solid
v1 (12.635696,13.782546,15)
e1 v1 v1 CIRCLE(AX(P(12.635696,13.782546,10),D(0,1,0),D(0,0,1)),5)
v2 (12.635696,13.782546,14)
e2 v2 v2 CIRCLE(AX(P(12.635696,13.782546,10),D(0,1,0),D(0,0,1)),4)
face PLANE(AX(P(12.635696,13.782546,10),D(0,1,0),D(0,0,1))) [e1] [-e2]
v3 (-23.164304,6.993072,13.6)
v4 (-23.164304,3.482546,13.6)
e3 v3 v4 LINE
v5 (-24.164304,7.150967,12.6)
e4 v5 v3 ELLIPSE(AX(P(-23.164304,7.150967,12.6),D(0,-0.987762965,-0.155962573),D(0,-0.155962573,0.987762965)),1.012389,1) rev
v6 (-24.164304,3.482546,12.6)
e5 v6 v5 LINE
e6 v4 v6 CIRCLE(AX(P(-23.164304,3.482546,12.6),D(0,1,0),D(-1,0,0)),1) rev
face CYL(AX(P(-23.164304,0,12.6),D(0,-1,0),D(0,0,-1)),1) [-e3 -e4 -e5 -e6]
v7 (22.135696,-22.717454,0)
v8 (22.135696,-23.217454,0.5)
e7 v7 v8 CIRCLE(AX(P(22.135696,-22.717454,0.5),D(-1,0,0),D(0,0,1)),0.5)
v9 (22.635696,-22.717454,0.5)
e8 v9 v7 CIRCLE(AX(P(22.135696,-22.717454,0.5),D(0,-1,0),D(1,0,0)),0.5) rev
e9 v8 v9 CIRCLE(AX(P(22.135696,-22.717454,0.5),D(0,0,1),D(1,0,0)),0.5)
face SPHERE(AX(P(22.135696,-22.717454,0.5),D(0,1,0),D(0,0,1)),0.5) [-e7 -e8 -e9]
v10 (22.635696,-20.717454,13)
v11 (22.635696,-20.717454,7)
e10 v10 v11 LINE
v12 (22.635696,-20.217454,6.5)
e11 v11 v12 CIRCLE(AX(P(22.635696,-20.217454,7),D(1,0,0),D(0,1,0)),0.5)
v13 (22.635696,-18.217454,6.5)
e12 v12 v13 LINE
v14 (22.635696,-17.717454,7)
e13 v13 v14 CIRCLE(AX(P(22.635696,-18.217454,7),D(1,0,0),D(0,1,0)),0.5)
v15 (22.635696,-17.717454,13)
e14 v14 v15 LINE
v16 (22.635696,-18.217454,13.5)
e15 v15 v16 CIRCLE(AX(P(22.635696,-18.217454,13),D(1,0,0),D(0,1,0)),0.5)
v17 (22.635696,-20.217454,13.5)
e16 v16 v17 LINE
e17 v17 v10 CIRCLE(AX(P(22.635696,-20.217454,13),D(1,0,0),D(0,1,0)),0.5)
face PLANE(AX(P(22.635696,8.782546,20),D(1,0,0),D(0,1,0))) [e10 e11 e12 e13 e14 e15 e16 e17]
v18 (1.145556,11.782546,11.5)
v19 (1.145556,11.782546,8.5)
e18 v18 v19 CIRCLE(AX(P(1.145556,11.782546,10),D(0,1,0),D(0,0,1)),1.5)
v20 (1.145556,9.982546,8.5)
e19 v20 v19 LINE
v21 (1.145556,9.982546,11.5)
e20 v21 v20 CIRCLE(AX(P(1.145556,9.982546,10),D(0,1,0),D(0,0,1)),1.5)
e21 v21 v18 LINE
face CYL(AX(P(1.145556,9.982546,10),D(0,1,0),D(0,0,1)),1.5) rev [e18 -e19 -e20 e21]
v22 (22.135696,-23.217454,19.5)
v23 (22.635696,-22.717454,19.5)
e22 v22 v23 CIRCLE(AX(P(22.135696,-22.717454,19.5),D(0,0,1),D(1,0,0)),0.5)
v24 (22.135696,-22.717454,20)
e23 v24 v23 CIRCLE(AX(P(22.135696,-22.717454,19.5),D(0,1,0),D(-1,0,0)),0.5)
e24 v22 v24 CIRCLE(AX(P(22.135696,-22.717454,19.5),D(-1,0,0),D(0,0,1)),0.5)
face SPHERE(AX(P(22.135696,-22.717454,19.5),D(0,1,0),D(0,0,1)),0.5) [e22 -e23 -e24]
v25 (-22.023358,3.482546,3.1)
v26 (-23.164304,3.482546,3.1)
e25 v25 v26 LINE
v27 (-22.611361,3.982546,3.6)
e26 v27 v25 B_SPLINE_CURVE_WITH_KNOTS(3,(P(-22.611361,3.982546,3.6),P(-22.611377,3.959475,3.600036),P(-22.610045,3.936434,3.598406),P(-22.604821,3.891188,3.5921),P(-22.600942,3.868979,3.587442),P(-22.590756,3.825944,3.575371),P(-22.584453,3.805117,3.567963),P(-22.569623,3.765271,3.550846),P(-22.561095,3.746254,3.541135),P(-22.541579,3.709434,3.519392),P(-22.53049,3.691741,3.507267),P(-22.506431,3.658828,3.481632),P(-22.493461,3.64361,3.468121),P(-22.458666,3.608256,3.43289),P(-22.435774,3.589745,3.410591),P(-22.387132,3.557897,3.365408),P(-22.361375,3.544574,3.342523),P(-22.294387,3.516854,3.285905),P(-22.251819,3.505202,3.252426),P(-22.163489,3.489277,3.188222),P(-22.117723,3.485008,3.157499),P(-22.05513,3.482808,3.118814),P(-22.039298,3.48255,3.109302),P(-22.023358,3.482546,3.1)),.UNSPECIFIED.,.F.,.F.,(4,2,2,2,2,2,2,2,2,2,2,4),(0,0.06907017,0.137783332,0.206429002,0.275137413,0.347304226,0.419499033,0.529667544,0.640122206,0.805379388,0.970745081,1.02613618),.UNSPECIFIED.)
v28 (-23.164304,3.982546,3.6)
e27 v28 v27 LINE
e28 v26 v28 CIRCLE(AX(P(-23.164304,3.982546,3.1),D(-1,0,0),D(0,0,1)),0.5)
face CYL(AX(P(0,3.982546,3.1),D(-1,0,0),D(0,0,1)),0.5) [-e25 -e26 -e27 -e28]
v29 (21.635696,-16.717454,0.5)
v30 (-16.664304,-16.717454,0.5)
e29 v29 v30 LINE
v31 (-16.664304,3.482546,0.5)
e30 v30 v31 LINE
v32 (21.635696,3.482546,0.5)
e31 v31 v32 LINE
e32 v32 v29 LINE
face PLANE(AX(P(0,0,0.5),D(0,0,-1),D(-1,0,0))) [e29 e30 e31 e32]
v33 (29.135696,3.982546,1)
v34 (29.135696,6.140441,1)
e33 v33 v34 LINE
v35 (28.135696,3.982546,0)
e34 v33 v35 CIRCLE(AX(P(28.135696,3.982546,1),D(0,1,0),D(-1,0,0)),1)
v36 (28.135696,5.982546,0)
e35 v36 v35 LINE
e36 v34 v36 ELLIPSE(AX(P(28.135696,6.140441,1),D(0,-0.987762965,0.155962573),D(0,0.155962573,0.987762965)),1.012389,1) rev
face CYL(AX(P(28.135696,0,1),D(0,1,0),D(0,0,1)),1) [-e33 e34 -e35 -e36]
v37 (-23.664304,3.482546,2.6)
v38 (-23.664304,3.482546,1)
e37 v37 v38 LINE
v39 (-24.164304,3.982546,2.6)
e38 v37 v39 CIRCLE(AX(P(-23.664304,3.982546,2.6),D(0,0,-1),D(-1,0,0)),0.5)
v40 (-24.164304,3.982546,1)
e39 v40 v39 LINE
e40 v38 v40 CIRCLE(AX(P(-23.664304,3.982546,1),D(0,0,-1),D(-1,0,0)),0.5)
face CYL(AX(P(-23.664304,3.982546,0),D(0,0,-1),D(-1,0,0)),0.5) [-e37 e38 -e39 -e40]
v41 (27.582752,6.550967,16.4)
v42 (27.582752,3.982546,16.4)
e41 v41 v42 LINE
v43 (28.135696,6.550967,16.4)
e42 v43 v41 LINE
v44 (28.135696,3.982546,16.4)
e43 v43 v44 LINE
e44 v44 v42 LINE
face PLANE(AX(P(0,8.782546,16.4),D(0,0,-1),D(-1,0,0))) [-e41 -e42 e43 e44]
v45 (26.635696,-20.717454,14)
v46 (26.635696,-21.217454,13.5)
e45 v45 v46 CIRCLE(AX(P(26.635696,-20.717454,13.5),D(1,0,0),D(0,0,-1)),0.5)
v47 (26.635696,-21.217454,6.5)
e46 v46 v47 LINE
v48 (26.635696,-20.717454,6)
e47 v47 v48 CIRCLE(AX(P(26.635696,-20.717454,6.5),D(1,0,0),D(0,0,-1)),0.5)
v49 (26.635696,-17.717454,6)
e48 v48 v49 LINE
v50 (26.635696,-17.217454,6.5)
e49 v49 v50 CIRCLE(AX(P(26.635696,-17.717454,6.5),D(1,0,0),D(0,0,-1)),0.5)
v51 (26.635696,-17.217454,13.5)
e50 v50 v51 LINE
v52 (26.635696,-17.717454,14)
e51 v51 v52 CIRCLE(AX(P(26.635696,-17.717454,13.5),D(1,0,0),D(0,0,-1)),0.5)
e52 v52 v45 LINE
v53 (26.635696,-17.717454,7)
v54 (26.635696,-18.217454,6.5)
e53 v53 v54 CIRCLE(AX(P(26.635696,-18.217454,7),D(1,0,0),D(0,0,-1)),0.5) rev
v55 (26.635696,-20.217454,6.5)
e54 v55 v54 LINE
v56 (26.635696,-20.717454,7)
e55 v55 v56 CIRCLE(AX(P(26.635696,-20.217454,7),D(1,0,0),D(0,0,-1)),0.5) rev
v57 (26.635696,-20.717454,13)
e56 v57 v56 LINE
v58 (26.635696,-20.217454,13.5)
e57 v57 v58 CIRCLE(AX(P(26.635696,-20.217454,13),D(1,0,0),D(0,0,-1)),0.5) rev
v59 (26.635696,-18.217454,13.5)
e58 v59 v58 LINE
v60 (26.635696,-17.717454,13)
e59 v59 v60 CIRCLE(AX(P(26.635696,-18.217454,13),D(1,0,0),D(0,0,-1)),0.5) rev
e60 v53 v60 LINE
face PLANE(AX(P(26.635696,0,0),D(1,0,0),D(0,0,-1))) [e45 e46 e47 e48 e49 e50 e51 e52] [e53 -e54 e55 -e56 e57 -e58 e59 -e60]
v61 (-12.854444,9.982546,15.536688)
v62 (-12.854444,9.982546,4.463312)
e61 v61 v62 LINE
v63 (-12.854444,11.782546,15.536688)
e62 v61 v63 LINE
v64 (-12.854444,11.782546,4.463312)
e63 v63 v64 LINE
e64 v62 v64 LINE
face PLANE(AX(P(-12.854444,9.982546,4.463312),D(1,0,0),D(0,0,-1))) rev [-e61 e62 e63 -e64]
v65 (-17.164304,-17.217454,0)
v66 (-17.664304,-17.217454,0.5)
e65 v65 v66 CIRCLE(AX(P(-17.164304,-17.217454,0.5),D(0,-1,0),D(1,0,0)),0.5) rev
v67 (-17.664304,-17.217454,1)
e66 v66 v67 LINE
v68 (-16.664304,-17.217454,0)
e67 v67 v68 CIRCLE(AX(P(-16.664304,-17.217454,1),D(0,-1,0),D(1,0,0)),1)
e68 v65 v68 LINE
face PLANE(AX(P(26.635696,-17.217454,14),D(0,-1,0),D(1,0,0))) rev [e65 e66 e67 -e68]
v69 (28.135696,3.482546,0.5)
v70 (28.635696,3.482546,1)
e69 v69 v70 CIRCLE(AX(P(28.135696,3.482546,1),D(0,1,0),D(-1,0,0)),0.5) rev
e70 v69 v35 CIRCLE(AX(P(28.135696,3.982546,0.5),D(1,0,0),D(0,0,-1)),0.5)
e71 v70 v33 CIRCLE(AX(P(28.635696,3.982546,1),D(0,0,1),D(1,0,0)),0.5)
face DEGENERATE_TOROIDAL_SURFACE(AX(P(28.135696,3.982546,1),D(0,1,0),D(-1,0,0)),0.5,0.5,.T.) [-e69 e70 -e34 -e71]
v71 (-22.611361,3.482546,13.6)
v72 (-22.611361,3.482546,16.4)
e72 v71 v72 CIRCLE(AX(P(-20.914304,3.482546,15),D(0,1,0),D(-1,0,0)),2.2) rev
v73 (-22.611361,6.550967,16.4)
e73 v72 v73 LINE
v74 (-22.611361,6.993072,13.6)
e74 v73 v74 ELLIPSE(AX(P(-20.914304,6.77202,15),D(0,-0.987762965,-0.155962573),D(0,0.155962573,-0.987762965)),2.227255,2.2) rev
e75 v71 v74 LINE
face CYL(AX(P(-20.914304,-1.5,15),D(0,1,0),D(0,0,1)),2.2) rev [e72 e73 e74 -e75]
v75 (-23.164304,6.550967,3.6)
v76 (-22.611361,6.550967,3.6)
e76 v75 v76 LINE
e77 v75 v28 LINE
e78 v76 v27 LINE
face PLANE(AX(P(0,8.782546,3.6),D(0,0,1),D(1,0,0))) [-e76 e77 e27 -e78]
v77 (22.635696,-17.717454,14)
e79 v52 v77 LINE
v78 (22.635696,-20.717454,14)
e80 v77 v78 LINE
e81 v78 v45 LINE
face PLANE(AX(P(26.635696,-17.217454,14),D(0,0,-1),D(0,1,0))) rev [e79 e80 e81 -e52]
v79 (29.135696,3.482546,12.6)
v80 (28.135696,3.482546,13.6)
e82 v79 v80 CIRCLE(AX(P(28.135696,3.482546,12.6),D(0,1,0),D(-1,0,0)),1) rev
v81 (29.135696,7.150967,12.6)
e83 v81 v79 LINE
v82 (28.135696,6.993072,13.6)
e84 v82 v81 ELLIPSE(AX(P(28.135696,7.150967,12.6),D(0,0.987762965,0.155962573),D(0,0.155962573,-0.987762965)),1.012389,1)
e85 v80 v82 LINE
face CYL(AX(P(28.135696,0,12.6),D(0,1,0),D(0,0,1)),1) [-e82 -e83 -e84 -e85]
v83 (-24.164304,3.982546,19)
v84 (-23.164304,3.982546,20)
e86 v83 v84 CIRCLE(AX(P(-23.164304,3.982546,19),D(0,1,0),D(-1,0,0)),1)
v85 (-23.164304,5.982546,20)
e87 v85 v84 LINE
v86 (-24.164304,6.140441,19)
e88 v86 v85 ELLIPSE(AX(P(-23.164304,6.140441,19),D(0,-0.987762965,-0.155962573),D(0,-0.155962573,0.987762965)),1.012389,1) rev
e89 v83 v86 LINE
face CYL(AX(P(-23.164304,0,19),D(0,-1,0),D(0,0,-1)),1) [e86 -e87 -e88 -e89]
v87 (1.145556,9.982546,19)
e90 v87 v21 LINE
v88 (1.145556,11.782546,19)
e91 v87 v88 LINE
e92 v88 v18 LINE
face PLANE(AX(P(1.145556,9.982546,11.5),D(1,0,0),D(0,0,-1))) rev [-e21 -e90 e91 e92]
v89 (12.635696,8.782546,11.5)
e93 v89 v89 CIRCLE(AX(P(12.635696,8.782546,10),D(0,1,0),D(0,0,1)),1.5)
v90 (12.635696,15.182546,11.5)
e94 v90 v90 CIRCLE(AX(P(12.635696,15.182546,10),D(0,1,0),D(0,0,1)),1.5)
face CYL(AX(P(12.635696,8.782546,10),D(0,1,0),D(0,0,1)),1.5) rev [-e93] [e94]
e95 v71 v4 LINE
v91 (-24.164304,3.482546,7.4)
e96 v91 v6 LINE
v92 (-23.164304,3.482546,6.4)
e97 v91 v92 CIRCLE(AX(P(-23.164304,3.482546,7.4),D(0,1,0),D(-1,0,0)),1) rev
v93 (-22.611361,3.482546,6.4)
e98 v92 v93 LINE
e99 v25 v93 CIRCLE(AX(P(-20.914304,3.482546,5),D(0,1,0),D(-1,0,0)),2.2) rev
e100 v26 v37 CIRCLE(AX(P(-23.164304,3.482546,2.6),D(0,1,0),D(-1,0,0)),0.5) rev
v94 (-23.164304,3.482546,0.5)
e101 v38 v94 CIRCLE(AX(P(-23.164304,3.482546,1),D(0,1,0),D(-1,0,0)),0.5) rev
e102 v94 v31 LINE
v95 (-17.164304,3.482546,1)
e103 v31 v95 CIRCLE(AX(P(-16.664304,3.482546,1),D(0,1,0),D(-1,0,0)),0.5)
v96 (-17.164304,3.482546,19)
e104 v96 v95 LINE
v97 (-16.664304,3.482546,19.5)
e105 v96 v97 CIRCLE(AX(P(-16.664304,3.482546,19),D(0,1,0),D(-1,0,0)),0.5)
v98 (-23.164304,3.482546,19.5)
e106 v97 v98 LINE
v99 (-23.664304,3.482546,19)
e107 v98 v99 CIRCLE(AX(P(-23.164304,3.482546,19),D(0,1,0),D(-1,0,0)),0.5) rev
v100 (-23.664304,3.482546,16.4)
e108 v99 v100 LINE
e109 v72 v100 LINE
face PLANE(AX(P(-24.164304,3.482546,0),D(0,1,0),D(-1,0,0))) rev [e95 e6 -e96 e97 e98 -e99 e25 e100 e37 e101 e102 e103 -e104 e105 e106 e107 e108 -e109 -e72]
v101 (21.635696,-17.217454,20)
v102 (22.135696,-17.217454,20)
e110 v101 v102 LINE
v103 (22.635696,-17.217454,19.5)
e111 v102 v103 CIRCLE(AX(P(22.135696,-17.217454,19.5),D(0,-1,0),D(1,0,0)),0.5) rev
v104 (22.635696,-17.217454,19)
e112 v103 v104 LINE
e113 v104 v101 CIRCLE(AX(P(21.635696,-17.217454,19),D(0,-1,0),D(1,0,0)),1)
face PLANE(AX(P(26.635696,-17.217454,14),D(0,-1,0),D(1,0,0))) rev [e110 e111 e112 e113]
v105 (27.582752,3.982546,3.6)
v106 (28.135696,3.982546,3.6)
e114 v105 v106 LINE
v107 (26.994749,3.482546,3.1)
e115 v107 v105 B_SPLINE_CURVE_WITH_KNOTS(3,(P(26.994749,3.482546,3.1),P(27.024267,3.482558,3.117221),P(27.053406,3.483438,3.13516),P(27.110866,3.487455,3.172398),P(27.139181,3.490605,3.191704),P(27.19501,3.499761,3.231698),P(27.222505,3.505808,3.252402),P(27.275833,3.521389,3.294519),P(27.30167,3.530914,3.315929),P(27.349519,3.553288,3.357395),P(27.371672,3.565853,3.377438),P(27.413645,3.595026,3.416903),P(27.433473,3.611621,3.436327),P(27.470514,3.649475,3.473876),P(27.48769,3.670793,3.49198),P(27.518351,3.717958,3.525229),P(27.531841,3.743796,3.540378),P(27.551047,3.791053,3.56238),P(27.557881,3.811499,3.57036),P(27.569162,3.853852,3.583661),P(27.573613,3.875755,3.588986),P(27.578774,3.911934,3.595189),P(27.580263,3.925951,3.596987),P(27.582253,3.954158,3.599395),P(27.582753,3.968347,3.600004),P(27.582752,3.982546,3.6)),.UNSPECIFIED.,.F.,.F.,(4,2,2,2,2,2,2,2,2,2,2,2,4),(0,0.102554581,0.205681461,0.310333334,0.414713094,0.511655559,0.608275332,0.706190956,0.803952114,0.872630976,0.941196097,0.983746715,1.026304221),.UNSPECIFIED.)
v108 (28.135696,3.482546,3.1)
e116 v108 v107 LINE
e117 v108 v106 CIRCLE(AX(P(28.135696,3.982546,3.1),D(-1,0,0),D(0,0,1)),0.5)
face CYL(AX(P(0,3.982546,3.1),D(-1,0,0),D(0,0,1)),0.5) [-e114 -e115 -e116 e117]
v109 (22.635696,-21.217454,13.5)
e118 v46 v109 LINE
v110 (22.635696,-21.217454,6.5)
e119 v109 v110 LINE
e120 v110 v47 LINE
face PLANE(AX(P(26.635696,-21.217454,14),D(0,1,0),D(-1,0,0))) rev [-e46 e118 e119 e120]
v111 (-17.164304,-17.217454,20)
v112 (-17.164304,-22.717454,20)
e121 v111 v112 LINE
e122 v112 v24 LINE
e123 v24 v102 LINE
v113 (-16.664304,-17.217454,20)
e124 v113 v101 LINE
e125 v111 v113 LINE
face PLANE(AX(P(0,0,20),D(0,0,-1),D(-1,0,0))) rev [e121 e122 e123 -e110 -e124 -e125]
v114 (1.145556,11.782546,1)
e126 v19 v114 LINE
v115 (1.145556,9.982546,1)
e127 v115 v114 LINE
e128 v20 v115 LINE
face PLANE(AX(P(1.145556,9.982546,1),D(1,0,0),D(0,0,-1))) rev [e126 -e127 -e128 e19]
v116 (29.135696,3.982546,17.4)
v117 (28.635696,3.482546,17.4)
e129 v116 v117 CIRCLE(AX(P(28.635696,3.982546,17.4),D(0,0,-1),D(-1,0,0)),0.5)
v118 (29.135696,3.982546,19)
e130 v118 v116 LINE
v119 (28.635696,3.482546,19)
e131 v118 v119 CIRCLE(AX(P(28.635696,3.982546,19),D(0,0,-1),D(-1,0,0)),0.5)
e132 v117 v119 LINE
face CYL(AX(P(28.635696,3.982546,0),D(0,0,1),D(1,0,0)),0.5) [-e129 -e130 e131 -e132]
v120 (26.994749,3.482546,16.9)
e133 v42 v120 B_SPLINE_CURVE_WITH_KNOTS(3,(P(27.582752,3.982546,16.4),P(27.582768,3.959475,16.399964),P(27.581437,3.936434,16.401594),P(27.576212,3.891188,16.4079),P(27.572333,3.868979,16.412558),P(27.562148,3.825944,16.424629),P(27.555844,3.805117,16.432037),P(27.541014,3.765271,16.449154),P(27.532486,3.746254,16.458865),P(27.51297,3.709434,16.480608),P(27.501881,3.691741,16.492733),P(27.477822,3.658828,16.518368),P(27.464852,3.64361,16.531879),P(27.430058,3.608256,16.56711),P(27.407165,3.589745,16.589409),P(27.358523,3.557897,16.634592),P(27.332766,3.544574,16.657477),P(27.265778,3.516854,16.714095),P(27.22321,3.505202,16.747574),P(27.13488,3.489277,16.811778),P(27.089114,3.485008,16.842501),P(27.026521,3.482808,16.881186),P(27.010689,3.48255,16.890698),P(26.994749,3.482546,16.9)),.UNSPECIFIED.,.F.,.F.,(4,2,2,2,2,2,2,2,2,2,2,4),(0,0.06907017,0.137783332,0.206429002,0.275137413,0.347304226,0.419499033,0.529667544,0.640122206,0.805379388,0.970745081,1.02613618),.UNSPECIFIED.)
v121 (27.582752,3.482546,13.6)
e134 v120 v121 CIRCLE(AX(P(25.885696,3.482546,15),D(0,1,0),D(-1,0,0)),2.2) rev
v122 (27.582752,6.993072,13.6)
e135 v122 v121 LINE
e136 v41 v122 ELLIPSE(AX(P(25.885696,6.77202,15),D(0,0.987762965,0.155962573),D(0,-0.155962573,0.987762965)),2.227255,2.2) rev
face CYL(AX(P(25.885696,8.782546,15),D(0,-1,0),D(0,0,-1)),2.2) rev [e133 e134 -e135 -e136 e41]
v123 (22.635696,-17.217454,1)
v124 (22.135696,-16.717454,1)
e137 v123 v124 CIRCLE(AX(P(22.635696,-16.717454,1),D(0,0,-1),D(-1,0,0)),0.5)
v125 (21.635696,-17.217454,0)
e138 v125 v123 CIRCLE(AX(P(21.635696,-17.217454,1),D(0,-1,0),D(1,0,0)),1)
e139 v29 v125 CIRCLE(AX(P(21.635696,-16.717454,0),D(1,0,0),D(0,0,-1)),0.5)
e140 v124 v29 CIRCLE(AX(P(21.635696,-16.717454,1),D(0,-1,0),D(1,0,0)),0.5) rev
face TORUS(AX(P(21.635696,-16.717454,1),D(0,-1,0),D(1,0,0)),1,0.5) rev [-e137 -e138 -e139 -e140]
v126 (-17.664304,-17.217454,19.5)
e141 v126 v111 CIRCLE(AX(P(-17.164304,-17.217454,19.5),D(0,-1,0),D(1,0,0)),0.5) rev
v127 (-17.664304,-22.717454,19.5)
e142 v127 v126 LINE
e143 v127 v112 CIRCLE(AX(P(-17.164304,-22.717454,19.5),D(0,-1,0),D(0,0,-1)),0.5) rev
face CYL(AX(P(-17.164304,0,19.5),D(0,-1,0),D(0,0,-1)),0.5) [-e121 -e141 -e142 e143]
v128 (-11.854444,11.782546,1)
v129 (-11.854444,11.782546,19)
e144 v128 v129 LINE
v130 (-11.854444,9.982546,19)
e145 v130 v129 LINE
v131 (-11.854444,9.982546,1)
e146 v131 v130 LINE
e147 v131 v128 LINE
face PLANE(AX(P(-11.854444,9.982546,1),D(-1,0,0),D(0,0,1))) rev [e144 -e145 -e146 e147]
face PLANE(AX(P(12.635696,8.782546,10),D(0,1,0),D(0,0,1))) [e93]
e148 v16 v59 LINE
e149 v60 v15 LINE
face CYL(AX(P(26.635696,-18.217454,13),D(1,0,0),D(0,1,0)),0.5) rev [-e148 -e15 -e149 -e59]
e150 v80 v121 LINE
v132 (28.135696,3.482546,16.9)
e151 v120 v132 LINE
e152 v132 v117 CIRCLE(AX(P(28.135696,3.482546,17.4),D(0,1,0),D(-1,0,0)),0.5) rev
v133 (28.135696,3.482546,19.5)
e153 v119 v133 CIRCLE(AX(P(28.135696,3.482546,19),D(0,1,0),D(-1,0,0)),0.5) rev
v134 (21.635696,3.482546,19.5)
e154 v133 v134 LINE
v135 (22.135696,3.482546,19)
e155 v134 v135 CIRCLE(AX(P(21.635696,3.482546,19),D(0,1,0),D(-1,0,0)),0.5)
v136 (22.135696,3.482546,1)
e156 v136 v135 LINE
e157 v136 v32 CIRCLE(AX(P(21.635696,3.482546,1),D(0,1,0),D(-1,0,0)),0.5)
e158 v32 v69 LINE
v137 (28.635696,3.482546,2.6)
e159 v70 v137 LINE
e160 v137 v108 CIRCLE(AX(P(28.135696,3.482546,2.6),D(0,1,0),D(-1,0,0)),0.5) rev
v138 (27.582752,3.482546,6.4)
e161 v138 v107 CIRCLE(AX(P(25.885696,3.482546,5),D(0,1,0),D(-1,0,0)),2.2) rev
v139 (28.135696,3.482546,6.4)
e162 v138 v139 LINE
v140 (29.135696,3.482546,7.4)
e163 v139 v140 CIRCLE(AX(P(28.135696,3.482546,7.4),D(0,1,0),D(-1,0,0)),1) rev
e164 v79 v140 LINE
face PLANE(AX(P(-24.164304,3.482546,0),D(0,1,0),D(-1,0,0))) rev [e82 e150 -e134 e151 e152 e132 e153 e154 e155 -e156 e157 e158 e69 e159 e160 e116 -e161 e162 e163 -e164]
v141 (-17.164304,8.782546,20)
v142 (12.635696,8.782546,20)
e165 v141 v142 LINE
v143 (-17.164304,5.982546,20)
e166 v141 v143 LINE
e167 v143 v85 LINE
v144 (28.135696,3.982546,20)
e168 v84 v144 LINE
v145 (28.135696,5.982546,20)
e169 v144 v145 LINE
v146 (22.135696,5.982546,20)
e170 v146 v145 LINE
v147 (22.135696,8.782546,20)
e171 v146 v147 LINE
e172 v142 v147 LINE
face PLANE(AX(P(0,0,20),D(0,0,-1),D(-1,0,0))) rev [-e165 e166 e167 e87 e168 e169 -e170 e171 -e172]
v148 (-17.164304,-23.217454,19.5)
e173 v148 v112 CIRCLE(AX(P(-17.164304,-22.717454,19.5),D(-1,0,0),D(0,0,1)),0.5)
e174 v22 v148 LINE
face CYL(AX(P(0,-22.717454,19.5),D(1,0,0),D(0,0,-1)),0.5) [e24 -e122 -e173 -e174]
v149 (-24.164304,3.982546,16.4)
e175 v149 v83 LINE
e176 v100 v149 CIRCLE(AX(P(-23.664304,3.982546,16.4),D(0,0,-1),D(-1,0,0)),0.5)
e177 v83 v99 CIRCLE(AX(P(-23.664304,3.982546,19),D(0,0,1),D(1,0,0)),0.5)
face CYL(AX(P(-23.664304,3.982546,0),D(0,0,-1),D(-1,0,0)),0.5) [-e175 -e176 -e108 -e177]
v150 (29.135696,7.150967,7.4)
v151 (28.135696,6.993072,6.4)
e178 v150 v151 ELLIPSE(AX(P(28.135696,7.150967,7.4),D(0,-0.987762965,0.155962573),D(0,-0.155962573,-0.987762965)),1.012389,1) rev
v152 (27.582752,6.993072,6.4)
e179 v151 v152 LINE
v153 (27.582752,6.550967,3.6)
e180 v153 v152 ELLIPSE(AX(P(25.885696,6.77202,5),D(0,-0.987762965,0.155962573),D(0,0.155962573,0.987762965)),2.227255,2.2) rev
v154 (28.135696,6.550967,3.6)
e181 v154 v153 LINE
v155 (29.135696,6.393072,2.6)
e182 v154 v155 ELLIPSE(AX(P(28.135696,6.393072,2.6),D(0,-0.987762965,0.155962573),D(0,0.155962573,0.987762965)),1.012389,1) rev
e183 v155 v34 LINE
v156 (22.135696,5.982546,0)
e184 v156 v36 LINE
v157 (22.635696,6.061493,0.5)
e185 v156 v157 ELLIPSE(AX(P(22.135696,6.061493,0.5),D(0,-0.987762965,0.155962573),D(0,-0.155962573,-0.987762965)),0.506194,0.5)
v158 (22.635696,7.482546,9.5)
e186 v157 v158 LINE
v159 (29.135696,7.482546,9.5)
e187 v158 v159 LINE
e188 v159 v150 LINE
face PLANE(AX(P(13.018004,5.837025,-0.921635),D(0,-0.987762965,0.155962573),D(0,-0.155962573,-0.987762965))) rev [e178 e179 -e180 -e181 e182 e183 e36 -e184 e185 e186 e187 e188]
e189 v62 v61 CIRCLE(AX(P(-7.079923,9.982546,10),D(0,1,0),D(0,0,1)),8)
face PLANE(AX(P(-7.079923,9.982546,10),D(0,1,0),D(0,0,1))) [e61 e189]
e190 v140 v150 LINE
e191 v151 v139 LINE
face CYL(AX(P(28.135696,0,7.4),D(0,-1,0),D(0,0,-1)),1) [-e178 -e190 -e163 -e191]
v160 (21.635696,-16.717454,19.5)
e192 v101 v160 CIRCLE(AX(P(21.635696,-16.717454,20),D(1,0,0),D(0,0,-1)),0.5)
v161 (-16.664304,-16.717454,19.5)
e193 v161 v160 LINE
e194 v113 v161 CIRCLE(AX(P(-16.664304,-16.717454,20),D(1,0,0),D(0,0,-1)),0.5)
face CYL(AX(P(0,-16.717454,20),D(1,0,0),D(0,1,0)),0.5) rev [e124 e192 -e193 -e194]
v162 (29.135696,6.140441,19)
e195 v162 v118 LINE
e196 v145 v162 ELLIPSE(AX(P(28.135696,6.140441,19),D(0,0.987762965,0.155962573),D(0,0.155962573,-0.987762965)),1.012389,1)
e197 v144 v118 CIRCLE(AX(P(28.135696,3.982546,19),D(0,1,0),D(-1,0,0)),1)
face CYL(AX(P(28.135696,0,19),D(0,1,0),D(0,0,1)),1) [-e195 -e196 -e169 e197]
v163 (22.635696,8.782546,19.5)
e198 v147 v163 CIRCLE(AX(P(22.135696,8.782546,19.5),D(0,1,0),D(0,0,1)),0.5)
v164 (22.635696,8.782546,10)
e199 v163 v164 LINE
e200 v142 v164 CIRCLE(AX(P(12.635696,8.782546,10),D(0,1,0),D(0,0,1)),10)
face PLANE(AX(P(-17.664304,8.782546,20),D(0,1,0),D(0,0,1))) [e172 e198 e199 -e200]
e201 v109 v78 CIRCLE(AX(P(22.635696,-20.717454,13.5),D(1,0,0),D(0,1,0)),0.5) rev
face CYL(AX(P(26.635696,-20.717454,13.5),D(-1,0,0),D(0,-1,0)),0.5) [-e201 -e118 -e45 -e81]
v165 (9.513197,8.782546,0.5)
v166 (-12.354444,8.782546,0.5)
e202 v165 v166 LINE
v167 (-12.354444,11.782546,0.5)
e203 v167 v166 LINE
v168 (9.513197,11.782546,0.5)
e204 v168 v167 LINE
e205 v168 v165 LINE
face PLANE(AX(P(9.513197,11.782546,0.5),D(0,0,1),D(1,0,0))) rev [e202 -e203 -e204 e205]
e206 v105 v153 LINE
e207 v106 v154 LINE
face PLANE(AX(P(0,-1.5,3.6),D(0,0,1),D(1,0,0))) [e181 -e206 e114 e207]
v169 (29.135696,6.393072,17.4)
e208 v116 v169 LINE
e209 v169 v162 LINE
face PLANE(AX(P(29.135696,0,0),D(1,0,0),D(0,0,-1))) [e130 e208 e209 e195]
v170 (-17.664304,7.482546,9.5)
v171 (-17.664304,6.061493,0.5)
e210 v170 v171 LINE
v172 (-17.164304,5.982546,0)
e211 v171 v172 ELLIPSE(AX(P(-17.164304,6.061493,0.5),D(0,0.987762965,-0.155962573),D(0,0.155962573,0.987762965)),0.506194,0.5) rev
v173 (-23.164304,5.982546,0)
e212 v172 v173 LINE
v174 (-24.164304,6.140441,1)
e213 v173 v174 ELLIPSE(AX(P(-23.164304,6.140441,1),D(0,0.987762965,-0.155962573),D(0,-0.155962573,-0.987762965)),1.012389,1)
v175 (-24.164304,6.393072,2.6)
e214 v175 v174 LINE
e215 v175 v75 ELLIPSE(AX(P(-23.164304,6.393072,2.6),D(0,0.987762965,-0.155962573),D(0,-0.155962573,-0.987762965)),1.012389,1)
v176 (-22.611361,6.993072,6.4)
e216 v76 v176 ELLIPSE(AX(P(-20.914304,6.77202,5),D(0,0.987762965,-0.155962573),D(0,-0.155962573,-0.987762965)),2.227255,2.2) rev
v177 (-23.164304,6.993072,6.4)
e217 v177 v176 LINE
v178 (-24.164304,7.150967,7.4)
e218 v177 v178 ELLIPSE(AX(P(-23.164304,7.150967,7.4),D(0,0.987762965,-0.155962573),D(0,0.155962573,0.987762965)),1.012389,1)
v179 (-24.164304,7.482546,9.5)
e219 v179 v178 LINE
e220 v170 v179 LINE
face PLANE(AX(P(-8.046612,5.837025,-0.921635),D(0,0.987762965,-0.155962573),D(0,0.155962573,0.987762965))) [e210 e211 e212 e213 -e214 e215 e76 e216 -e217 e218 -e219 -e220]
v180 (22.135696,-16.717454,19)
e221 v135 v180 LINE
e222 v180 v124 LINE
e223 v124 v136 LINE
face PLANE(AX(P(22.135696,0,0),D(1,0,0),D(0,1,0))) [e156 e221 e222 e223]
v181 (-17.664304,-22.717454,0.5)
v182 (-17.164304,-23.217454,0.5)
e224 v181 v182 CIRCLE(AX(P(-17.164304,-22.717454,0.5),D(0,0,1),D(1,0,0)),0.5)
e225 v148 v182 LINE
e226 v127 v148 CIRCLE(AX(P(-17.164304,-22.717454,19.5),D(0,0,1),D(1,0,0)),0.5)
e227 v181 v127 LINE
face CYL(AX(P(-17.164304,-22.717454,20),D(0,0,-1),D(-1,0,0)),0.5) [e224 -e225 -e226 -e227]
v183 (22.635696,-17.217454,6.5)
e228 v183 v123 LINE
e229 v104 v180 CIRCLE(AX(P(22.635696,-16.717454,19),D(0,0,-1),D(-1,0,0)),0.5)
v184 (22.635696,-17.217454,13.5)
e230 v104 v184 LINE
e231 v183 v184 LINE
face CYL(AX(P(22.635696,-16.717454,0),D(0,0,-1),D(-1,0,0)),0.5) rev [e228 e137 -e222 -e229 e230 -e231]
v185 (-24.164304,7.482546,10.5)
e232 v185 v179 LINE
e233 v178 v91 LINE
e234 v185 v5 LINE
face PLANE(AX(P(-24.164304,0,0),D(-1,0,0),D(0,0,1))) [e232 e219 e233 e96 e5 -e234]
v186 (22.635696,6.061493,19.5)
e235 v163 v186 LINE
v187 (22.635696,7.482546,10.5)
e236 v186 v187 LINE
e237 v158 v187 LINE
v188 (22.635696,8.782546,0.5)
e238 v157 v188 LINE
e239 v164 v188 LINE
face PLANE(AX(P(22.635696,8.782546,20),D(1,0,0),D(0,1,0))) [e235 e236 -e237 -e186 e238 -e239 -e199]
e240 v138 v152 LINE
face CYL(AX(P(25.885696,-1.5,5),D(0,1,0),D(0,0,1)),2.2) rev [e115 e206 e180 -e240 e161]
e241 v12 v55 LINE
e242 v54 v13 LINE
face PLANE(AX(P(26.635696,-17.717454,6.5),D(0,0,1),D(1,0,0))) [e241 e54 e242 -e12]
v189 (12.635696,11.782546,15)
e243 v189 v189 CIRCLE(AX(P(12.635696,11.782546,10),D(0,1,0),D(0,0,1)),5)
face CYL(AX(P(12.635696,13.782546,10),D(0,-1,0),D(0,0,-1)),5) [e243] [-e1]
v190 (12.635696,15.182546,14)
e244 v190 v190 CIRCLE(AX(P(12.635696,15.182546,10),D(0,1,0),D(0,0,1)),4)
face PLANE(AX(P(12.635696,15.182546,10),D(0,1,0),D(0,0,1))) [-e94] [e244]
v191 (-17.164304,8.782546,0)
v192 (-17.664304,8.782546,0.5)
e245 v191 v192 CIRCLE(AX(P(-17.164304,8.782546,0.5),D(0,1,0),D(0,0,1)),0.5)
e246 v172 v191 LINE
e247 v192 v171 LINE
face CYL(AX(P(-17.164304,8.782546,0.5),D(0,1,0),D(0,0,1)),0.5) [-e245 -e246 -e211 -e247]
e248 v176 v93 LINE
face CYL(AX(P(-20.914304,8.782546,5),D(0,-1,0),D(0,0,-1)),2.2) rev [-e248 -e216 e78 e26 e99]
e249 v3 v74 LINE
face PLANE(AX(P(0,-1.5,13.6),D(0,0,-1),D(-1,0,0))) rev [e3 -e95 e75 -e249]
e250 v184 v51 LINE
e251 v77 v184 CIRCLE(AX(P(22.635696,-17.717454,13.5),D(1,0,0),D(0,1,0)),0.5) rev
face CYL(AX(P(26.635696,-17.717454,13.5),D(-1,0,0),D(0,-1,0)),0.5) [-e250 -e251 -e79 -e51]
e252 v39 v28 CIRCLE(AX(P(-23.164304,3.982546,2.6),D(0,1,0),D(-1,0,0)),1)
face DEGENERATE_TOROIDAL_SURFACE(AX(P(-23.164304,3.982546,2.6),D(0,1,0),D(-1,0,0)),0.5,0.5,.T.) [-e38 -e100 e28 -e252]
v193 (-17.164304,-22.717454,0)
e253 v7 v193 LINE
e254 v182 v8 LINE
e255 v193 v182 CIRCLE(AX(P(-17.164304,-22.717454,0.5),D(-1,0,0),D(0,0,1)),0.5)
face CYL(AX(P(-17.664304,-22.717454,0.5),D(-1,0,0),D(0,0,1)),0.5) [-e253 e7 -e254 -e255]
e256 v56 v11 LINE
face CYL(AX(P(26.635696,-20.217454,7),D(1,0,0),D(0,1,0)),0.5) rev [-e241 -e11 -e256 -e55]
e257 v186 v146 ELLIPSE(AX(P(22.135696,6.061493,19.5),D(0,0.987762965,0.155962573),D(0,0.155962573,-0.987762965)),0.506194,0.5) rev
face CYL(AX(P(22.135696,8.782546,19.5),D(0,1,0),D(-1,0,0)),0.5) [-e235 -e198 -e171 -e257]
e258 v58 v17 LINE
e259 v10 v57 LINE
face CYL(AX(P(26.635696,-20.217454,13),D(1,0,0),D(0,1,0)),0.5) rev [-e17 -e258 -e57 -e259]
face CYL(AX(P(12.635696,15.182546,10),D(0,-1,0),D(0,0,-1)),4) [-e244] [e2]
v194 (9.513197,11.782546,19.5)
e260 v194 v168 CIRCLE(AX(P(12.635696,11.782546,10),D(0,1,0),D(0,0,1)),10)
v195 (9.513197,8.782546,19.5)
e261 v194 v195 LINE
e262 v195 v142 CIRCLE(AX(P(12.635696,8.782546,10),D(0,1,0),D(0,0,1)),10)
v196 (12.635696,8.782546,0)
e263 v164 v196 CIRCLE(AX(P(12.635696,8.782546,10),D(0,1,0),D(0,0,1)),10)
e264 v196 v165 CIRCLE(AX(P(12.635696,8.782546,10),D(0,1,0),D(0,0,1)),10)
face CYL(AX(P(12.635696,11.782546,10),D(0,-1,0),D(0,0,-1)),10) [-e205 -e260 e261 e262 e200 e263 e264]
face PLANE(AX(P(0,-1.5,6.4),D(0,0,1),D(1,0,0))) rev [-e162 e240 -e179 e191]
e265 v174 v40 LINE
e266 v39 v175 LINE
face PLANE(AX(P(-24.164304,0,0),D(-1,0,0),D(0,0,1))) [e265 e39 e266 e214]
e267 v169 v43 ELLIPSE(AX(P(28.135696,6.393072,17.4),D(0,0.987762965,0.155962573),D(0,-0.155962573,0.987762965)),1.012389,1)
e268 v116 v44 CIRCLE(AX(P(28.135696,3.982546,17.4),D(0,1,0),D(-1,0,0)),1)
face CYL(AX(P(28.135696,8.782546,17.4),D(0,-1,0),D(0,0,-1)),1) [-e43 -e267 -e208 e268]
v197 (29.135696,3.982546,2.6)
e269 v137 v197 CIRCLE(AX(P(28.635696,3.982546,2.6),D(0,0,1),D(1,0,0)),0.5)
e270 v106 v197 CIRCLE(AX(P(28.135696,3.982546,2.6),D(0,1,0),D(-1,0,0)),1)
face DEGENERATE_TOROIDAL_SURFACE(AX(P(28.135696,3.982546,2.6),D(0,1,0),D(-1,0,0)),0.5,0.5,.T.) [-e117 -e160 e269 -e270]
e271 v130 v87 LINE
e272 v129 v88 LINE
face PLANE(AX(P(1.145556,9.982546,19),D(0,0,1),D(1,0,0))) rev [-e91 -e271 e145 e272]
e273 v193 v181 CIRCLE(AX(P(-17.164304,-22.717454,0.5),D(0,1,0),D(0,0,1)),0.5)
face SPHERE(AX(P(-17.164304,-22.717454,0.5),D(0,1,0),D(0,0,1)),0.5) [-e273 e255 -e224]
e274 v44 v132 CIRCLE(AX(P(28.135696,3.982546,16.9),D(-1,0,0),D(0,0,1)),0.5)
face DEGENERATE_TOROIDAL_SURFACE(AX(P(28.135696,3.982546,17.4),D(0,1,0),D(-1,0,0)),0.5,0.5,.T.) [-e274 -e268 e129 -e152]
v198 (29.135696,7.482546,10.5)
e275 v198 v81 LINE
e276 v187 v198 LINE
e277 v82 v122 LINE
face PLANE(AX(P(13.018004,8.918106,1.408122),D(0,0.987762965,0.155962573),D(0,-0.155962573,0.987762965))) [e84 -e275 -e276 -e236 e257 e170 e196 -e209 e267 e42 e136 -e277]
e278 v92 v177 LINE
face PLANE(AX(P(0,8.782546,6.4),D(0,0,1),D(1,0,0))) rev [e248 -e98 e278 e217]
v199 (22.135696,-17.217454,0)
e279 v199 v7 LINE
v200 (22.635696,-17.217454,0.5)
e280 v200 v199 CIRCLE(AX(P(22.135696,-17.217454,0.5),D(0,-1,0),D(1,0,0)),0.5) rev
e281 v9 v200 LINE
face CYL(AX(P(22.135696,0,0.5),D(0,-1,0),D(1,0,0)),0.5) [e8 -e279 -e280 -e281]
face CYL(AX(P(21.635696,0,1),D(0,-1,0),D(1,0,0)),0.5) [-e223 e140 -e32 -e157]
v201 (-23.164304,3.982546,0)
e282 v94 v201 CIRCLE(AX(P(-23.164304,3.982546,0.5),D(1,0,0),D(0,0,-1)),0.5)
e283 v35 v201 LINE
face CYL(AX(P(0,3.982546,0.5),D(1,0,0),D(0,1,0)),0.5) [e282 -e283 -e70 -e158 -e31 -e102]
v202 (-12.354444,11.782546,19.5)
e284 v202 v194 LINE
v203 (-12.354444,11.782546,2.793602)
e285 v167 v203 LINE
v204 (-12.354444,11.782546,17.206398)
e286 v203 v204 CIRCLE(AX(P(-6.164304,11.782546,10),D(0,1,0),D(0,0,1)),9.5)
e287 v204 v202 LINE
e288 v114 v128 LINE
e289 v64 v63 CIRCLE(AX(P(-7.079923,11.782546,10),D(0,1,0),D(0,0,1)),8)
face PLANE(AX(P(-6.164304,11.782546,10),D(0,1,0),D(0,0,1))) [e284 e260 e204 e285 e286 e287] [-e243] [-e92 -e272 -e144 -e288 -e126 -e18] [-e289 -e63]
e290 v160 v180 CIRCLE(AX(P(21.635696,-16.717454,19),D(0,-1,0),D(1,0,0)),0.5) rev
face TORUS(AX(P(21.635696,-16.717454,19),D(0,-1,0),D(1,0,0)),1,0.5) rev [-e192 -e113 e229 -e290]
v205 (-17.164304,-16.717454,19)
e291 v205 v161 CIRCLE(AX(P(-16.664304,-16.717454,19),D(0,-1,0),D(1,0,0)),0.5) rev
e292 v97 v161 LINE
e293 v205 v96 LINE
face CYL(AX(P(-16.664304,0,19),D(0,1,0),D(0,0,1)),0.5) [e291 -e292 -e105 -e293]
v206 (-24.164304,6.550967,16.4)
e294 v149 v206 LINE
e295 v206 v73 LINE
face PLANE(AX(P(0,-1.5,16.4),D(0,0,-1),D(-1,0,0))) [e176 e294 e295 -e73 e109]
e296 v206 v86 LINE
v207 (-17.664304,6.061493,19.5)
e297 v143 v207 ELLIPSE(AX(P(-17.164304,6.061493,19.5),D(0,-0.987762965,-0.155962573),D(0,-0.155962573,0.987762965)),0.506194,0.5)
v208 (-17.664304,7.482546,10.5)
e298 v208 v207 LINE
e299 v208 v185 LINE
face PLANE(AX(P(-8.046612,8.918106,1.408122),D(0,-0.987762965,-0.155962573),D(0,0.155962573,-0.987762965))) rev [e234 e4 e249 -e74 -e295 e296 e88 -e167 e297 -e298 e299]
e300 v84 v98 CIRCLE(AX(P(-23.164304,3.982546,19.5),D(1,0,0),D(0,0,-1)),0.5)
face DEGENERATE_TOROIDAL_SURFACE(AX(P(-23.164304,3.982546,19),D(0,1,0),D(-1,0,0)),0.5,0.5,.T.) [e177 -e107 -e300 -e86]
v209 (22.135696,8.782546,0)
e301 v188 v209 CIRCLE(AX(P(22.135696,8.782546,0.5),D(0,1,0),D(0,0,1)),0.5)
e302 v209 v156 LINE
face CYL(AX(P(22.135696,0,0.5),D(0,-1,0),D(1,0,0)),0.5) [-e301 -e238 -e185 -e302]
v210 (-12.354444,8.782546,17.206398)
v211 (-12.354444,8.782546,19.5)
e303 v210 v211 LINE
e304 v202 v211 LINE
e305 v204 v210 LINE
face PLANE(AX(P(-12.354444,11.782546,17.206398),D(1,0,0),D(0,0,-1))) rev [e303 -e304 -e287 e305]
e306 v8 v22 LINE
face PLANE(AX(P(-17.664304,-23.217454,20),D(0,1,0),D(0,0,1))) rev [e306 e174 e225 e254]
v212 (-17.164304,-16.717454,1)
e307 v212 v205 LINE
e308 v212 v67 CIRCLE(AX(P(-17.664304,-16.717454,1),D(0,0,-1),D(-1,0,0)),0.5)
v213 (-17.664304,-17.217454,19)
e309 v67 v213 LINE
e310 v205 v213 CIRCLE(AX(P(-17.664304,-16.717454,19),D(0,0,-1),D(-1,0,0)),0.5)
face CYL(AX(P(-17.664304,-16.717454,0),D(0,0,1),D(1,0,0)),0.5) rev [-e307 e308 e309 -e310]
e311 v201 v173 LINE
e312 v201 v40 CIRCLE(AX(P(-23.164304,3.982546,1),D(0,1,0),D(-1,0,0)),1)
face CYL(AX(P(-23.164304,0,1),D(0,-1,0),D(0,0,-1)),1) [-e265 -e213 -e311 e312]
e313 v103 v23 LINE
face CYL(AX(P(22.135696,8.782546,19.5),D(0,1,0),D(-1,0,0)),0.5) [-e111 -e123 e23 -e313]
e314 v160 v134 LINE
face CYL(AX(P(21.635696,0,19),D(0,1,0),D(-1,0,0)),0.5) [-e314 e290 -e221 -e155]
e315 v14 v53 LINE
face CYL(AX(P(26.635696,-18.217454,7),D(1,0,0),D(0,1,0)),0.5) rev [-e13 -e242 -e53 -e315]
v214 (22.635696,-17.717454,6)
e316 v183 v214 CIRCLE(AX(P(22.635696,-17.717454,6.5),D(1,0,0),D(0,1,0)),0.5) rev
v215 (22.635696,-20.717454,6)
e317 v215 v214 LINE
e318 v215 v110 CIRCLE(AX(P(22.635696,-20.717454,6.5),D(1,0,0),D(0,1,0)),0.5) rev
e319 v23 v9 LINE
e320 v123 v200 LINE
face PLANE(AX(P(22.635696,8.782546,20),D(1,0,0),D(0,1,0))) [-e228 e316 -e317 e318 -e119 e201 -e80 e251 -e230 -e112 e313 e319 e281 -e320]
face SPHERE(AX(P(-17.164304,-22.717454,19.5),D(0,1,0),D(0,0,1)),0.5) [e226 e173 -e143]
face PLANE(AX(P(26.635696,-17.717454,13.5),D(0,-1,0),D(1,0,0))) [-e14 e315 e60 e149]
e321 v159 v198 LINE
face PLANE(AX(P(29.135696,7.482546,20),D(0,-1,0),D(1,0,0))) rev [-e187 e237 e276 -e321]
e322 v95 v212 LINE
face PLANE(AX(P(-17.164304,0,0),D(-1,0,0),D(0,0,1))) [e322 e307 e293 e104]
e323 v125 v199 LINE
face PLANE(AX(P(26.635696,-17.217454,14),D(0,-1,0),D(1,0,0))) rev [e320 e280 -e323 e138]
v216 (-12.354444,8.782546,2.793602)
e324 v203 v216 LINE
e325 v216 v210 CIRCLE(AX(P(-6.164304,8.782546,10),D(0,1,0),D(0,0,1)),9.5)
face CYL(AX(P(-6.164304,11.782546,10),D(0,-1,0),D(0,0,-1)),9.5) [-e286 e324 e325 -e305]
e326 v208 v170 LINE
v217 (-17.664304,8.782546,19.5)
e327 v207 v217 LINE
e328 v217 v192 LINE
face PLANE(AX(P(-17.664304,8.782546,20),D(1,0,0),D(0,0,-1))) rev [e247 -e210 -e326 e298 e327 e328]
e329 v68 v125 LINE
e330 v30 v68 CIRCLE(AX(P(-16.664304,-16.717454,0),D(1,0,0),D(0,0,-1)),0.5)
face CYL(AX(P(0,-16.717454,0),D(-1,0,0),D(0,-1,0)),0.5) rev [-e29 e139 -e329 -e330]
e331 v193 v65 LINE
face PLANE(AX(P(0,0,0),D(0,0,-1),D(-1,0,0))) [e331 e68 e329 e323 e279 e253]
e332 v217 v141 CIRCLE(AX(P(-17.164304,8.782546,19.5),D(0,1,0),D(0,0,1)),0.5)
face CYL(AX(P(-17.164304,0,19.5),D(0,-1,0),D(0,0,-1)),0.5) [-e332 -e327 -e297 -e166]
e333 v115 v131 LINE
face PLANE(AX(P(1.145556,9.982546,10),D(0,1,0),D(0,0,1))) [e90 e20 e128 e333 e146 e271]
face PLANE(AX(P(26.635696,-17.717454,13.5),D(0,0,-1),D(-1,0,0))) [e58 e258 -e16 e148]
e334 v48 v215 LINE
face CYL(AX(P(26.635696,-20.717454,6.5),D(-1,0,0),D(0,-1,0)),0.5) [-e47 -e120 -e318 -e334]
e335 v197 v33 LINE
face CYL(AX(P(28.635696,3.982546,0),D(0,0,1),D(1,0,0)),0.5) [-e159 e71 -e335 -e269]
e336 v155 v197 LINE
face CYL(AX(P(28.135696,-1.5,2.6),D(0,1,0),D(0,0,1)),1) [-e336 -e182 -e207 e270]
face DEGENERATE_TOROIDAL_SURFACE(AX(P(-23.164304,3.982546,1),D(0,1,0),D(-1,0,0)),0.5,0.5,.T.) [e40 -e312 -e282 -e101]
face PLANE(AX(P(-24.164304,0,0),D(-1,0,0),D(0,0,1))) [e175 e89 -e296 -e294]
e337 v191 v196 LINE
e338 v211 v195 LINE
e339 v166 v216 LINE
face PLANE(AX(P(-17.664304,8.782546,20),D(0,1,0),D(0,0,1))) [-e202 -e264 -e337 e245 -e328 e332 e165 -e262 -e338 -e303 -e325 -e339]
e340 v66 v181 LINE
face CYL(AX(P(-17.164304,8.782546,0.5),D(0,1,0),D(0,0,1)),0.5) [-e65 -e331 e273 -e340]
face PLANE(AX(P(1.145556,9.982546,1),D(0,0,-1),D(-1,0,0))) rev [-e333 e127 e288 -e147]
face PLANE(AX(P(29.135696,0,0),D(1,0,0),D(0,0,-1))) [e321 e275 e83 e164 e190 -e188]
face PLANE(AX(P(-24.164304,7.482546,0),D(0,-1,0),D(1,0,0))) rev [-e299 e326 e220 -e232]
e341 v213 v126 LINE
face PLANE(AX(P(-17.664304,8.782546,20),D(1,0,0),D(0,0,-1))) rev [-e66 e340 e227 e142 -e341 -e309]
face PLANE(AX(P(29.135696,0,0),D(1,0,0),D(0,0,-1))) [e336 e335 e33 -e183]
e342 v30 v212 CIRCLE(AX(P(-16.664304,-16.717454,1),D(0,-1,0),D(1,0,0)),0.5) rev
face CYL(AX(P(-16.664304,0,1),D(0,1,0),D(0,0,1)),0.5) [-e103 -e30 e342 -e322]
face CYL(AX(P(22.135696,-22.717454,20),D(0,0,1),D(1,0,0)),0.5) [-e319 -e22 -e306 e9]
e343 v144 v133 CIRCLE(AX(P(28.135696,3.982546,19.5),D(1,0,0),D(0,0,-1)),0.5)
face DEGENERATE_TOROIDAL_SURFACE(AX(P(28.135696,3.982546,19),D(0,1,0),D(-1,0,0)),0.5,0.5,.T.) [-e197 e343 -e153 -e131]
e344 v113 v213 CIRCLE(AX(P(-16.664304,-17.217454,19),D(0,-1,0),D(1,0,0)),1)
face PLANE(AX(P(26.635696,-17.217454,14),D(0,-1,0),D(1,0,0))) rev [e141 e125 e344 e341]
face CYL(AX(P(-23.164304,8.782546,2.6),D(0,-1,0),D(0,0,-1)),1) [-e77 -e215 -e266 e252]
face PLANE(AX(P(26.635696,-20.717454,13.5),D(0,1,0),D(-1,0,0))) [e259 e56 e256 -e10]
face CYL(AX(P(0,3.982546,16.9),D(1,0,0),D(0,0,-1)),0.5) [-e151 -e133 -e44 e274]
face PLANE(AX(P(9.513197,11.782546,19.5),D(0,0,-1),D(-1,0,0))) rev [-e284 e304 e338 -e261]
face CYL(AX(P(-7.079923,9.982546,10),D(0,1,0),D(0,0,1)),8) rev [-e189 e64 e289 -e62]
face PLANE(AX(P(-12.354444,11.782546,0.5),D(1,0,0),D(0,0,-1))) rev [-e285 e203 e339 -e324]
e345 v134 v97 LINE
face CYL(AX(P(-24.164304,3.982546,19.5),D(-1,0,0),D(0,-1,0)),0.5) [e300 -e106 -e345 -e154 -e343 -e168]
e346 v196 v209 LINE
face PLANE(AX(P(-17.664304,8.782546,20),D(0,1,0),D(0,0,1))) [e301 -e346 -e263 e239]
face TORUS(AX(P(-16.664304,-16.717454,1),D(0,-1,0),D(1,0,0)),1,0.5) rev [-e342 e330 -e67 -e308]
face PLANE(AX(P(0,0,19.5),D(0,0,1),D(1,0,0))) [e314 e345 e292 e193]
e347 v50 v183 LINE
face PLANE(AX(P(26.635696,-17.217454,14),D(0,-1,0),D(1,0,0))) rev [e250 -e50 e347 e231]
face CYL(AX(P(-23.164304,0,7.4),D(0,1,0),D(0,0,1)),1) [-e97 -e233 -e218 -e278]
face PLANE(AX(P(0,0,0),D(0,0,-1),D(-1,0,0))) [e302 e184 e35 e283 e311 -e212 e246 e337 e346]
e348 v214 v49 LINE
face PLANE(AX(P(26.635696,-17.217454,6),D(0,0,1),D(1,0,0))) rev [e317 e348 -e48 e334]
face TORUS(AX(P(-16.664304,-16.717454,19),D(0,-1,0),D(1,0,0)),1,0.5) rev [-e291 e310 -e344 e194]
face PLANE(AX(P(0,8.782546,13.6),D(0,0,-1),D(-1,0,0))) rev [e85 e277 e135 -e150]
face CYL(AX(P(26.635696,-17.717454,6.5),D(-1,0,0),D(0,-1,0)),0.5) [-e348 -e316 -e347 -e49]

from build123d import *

# Parameters (mm, degrees)
SKETCH_2_W               = 40.3
SKETCH_2_H               = 32
EXTRUDE_1_DEPTH          = 20
SKETCH_3_W               = 20
SKETCH_3_H               = 4
EXTRUDE_2_DEPTH          = 6.5
CUT_EXTRUDE_4_DEPTH      = 6.5
SKETCH_4_W               = 20
SKETCH_4_H               = 4
EXTRUDE_3_DEPTH          = 6.5
CUT_EXTRUDE_5_DEPTH      = 6.5
CUT_EXTRUDE_6_DEPTH      = 43.284026865
CUT_EXTRUDE_6_DEPTH_BACK = 1.5
SKETCH_7_W               = 8
SKETCH_7_H               = 4
SKETCH_7_W_2             = 7
SKETCH_7_H_2             = 3
EXTRUDE_4_DEPTH          = 4
EXTRUDE_5_DEPTH          = 3
SKETCH_9_R               = 5
EXTRUDE_6_DEPTH          = 2
SKETCH_10_R              = 4
EXTRUDE_7_DEPTH          = 1.4
SKETCH_11_R              = 1.5
CUT_EXTRUDE_3_DEPTH      = 6.4
SKETCH_17_W              = 20
SKETCH_17_H              = 20.7
CUT_EXTRUDE_7_DEPTH      = 0.5
SKETCH_18_W              = 39.8
SKETCH_18_H              = 20.7
CUT_EXTRUDE_8_DEPTH      = 0.5
SKETCH_19_W              = 19.5
SKETCH_19_H              = 20.7
CUT_EXTRUDE_9_DEPTH      = 0.5
SKETCH_20_W              = 39.3
SKETCH_20_H              = 20.7
CUT_EXTRUDE_10_DEPTH     = 0.5
FILLET_5_R               = 1
FILLET_6_R               = 0.5
FILLET_7_R               = 0.5
FILLET_8_R               = 0.5
FILLET_9_R               = 0.5
CUT_EXTRUDE_12_DEPTH     = 1.8


with BuildPart() as part:
    # 草圖2 → 填料-伸長1 (new body)
    with BuildSketch(Plane.XY):
        with Locations((2.485695538, -7.217454068)):
            Rectangle(SKETCH_2_W, SKETCH_2_H)
    extrude(amount=EXTRUDE_1_DEPTH)

    # 草圖3 → 填料-伸長2 (add)
    with BuildSketch(Plane(origin=(22.635695538, 0, 0), x_dir=(0, 0, -1), z_dir=(1, 0, 0))):
        with Locations((-10, 5.482545932)):
            Rectangle(SKETCH_3_W, SKETCH_3_H)
    extrude(amount=EXTRUDE_2_DEPTH)

    # 草圖13 → 除料-伸長4 (cut)
    with BuildSketch(Plane(origin=(29.135695538, 0, 0), x_dir=(0, 0, -1), z_dir=(1, 0, 0))):
        Polygon((-20, 5.982545932), (-10.5, 7.482545932), (-20, 7.482545932), align=None)
        Polygon((0, 7.482545932), (-9.5, 7.482545932), (0, 5.982545932), align=None)
    extrude(amount=-CUT_EXTRUDE_4_DEPTH, mode=Mode.SUBTRACT)

    # 草圖4 → 填料-伸長3 (add)
    with BuildSketch(Plane.ZY.offset(17.664304462)):
        with Locations((10, 5.482545932)):
            Rectangle(SKETCH_4_W, SKETCH_4_H)
    extrude(amount=EXTRUDE_3_DEPTH)

    # 草圖14 → 除料-伸長5 (cut)
    with BuildSketch(Plane.ZY.offset(24.164304462)):
        Polygon((0, 5.982545932), (9.5, 7.482545932), (0, 7.482545932), align=None)
        Polygon((20, 7.482545932), (10.5, 7.482545932), (20, 5.982545932), align=None)
    extrude(amount=-CUT_EXTRUDE_5_DEPTH, mode=Mode.SUBTRACT)

    # 草圖16 → 除料-伸長6 (cut, two sides: drawn at the far end of the back side and taken through both)
    with BuildSketch(Plane(origin=(0, 0, 0), x_dir=(1, 0, 0), z_dir=(0, 1, 0)).offset(-CUT_EXTRUDE_6_DEPTH_BACK)):
        with BuildLine():
            Line((-24.164304462, -3.6), (-24.164304462, -6.4))
            Line((-24.164304462, -6.4), (-22.611360737, -6.4))
            ThreePointArc((-22.611360737, -6.4), (-18.714304462, -5), (-22.611360737, -3.6))
            Line((-22.611360737, -3.6), (-24.164304462, -3.6))
        make_face()
        with BuildLine():
            Line((-24.164304462, -13.6), (-24.164304462, -16.4))
            Line((-24.164304462, -16.4), (-22.611360737, -16.4))
            ThreePointArc((-22.611360737, -16.4), (-18.714304462, -15), (-22.611360737, -13.6))
            Line((-22.611360737, -13.6), (-24.164304462, -13.6))
        make_face()
        with BuildLine():
            Line((27.582751813, -16.4), (29.135695538, -16.4))
            Line((29.135695538, -16.4), (29.135695538, -13.6))
            Line((29.135695538, -13.6), (27.582751813, -13.6))
            ThreePointArc((27.582751813, -13.6), (23.685695538, -15), (27.582751813, -16.4))
        make_face()
        with BuildLine():
            Line((27.582751813, -6.4), (29.135695538, -6.4))
            Line((29.135695538, -6.4), (29.135695538, -3.6))
            Line((29.135695538, -3.6), (27.582751813, -3.6))
            ThreePointArc((27.582751813, -3.6), (23.685695538, -5), (27.582751813, -6.4))
        make_face()
    extrude(amount=CUT_EXTRUDE_6_DEPTH + CUT_EXTRUDE_6_DEPTH_BACK, mode=Mode.SUBTRACT)

    # 草圖7 → 填料-伸長4 (add)
    with BuildSketch(Plane(origin=(22.635695538, 0, 0), x_dir=(0, 0, -1), z_dir=(1, 0, 0))):
        with Locations((-10, -19.217454068)):
            Rectangle(SKETCH_7_W, SKETCH_7_H)
        with Locations((-10, -19.217454068)):
            Rectangle(SKETCH_7_W_2, SKETCH_7_H_2, mode=Mode.SUBTRACT)
    extrude(amount=EXTRUDE_4_DEPTH)

    # 草圖8 → 填料-伸長5 (add)
    with BuildSketch(Plane(origin=(0, 8.782545932, 0), x_dir=(1, 0, 0), z_dir=(0, 1, 0))):
        with BuildLine():
            Line((-12.354443672, -17.206398307), (-12.354443672, -19.5))
            Line((-12.354443672, -19.5), (9.513196539, -19.5))
            ThreePointArc((9.513196539, -19.5), (22.635695538, -10), (9.513196539, -0.5))
            Line((9.513196539, -0.5), (-12.354443672, -0.5))
            Line((-12.354443672, -0.5), (-12.354443672, -2.793601693))
            ThreePointArc((-12.354443672, -2.793601693), (-15.664304462, -10), (-12.354443672, -17.206398307))
        make_face()
    extrude(amount=EXTRUDE_5_DEPTH)

    # 草圖9 → 填料-伸長6 (add)
    with BuildSketch(Plane(origin=(0, 11.782545932, 0), x_dir=(1, 0, 0), z_dir=(0, 1, 0))):
        with Locations(Location((12.635695538, -10, 0), (0, 0, 270))):
            Circle(SKETCH_9_R)
    extrude(amount=EXTRUDE_6_DEPTH)

    # 草圖10 → 填料-伸長7 (add)
    with BuildSketch(Plane(origin=(0, 13.782545932, 0), x_dir=(1, 0, 0), z_dir=(0, 1, 0))):
        with Locations(Location((12.635695538, -10, 0), (0, 0, 270))):
            Circle(SKETCH_10_R)
    extrude(amount=EXTRUDE_7_DEPTH)

    # 草圖11 → 除料-伸長3 (cut)
    with BuildSketch(Plane(origin=(0, 15.182545932, 0), x_dir=(1, 0, 0), z_dir=(0, 1, 0))):
        with Locations(Location((12.635695538, -10, 0), (0, 0, 270))):
            Circle(SKETCH_11_R)
    extrude(amount=-CUT_EXTRUDE_3_DEPTH, mode=Mode.SUBTRACT)

    # 草圖17 → 除料-伸長7 (cut)
    with BuildSketch(Plane(origin=(22.635695538, 0, 0), x_dir=(0, 0, -1), z_dir=(1, 0, 0))):
        with Locations((-10, -6.867454068)):
            Rectangle(SKETCH_17_W, SKETCH_17_H)
    extrude(amount=-CUT_EXTRUDE_7_DEPTH, mode=Mode.SUBTRACT)

    # 草圖18 → 除料-伸長8 (cut)
    with BuildSketch(Plane.XY.offset(20)):
        with Locations((2.235695538, -6.867454068)):
            Rectangle(SKETCH_18_W, SKETCH_18_H)
    extrude(amount=-CUT_EXTRUDE_8_DEPTH, mode=Mode.SUBTRACT)

    # 草圖19 → 除料-伸長9 (cut)
    with BuildSketch(Plane.ZY.offset(17.664304462)):
        with Locations((9.75, -6.867454068)):
            Rectangle(SKETCH_19_W, SKETCH_19_H)
    extrude(amount=-CUT_EXTRUDE_9_DEPTH, mode=Mode.SUBTRACT)

    # 草圖20 → 除料-伸長10 (cut)
    with BuildSketch(Plane(origin=(0, 0, 0), x_dir=(-1, 0, 0), z_dir=(0, 0, -1))):
        with Locations((-2.485695538, -6.867454068)):
            Rectangle(SKETCH_20_W, SKETCH_20_H)
    extrude(amount=-CUT_EXTRUDE_10_DEPTH, mode=Mode.SUBTRACT)

    # 圓角5
    fillet_5_edges = [part.edges().sort_by_distance(p)[0] for p in [
        (29.135695538, 5.23780909, 13.6),
        (29.135695538, 5.016756458, 16.4),
        (-24.164304462, 5.23780909, 13.6),
        (29.135695538, 5.016756458, 3.6),
        (29.135695538, 5.23780909, 6.4),
        (-24.164304462, 5.23780909, 6.4),
        (-24.164304462, 5.016756458, 3.6),
        (29.135695538, 4.732545932, 0),
        (29.135695538, 4.732545932, 20),
        (-24.164304462, 4.732545932, 20),
        (-24.164304462, 4.732545932, 0),
    ]]
    fillet(fillet_5_edges, radius=FILLET_5_R)

    # 圓角6
    fillet_6_edges = [part.edges().sort_by_distance(p)[0] for p in [
        (-17.664304462, 7.382545932, 20),
        (22.635695538, -20.217454068, 0),
        (22.635695538, -20.217454068, 20),
        (-17.664304462, -20.217454068, 20),
        (22.135695538, -6.867454068, 19.5),
        (-17.664304462, -20.217454068, 0),
        (-17.164304462, -6.867454068, 19.5),
        (22.135695538, -6.867454068, 0.5),
        (-17.164304462, -6.867454068, 0.5),
        (-17.664304462, 7.382545932, 0),
        (22.635695538, 7.382545932, 0),
        (22.635695538, 7.382545932, 20),
    ]]
    fillet(fillet_6_edges, radius=FILLET_6_R)

    # 圓角7
    fillet_7_edges = [part.edges().sort_by_distance(p)[0] for p in [
        (2.485695538, -23.217454068, 0),
        (22.635695538, -23.217454068, 10),
        (2.485695538, -23.217454068, 20),
        (-17.664304462, -23.217454068, 10),
        (-17.517857853, -23.217454068, 0.146446609),
        (-17.517857853, -23.217454068, 19.853553391),
        (22.489248929, -23.217454068, 19.853553391),
        (22.489248929, -23.217454068, 0.146446609),
        (2.485695538, -17.217454068, 0.5),
        (22.135695538, -17.217454068, 10),
        (2.485695538, -17.217454068, 19.5),
        (-17.164304462, -17.217454068, 10),
        (-17.017857853, -17.217454068, 0.646446609),
        (-17.017857853, -17.217454068, 19.353553391),
        (21.989248929, -17.217454068, 19.353553391),
        (21.989248929, -17.217454068, 0.646446609),
    ]]
    fillet(fillet_7_edges, radius=FILLET_7_R - 0.0001)  # a hair under: the kernel refuses the full size

    # 圓角8
    fillet_8_edges = [part.edges().sort_by_distance(p)[0] for p in [
        (27.859223675, 3.482545932, 3.6),
        (28.842802319, 3.482545932, 3.307106781),
        (29.135695538, 3.482545932, 1.8),
        (28.842802319, 3.482545932, 0.292893219),
        (-22.887832599, 3.482545932, 3.6),
        (-23.871411243, 3.482545932, 3.307106781),
        (-24.164304462, 3.482545932, 1.8),
        (-23.871411243, 3.482545932, 0.292893219),
        (27.859223675, 3.482545932, 16.4),
        (28.842802319, 3.482545932, 16.692893219),
        (29.135695538, 3.482545932, 18.2),
        (28.842802319, 3.482545932, 19.707106781),
        (-24.164304462, 3.482545932, 17.7),
        (-23.871411243, 3.482545932, 19.707106781),
        (2.485695538, 3.482545932, 0),
        (2.485695538, 3.482545932, 20),
    ]]
    fillet(fillet_8_edges, radius=FILLET_8_R - 0.0001)  # a hair under: the kernel refuses the full size

    # 圓角9
    fillet_9_edges = [part.edges().sort_by_distance(p)[0] for p in [
        (24.635695538, -21.217454068, 6),
        (24.635695538, -17.217454068, 6),
        (24.635695538, -17.217454068, 14),
        (24.635695538, -21.217454068, 14),
        (24.635695538, -17.717454068, 6.5),
        (24.635695538, -17.717454068, 13.5),
        (24.635695538, -20.717454068, 13.5),
        (24.635695538, -20.717454068, 6.5),
    ]]
    fillet(fillet_9_edges, radius=FILLET_9_R)

    # 草圖22 → 除料-伸長12 (cut)
    with BuildSketch(Plane(origin=(0, 11.782545932, 0), x_dir=(1, 0, 0), z_dir=(0, 1, 0))):
        with BuildLine():
            Line((1.145556328, -1), (-11.854443672, -1))
            Line((-11.854443672, -1), (-11.854443672, -19))
            Line((-11.854443672, -19), (1.145556328, -19))
            Line((1.145556328, -19), (1.145556328, -11.5))
            ThreePointArc((1.145556328, -11.5), (2.645556328, -10), (1.145556328, -8.5))
            Line((1.145556328, -8.5), (1.145556328, -1))
        make_face()
        with BuildLine():
            Line((-12.854443672, -4.463311785), (-12.854443672, -15.536688215))
            ThreePointArc((-12.854443672, -15.536688215), (-15.079923466, -10), (-12.854443672, -4.463311785))
        make_face()
    extrude(amount=-CUT_EXTRUDE_12_DEPTH, mode=Mode.SUBTRACT)


solid = part.part
